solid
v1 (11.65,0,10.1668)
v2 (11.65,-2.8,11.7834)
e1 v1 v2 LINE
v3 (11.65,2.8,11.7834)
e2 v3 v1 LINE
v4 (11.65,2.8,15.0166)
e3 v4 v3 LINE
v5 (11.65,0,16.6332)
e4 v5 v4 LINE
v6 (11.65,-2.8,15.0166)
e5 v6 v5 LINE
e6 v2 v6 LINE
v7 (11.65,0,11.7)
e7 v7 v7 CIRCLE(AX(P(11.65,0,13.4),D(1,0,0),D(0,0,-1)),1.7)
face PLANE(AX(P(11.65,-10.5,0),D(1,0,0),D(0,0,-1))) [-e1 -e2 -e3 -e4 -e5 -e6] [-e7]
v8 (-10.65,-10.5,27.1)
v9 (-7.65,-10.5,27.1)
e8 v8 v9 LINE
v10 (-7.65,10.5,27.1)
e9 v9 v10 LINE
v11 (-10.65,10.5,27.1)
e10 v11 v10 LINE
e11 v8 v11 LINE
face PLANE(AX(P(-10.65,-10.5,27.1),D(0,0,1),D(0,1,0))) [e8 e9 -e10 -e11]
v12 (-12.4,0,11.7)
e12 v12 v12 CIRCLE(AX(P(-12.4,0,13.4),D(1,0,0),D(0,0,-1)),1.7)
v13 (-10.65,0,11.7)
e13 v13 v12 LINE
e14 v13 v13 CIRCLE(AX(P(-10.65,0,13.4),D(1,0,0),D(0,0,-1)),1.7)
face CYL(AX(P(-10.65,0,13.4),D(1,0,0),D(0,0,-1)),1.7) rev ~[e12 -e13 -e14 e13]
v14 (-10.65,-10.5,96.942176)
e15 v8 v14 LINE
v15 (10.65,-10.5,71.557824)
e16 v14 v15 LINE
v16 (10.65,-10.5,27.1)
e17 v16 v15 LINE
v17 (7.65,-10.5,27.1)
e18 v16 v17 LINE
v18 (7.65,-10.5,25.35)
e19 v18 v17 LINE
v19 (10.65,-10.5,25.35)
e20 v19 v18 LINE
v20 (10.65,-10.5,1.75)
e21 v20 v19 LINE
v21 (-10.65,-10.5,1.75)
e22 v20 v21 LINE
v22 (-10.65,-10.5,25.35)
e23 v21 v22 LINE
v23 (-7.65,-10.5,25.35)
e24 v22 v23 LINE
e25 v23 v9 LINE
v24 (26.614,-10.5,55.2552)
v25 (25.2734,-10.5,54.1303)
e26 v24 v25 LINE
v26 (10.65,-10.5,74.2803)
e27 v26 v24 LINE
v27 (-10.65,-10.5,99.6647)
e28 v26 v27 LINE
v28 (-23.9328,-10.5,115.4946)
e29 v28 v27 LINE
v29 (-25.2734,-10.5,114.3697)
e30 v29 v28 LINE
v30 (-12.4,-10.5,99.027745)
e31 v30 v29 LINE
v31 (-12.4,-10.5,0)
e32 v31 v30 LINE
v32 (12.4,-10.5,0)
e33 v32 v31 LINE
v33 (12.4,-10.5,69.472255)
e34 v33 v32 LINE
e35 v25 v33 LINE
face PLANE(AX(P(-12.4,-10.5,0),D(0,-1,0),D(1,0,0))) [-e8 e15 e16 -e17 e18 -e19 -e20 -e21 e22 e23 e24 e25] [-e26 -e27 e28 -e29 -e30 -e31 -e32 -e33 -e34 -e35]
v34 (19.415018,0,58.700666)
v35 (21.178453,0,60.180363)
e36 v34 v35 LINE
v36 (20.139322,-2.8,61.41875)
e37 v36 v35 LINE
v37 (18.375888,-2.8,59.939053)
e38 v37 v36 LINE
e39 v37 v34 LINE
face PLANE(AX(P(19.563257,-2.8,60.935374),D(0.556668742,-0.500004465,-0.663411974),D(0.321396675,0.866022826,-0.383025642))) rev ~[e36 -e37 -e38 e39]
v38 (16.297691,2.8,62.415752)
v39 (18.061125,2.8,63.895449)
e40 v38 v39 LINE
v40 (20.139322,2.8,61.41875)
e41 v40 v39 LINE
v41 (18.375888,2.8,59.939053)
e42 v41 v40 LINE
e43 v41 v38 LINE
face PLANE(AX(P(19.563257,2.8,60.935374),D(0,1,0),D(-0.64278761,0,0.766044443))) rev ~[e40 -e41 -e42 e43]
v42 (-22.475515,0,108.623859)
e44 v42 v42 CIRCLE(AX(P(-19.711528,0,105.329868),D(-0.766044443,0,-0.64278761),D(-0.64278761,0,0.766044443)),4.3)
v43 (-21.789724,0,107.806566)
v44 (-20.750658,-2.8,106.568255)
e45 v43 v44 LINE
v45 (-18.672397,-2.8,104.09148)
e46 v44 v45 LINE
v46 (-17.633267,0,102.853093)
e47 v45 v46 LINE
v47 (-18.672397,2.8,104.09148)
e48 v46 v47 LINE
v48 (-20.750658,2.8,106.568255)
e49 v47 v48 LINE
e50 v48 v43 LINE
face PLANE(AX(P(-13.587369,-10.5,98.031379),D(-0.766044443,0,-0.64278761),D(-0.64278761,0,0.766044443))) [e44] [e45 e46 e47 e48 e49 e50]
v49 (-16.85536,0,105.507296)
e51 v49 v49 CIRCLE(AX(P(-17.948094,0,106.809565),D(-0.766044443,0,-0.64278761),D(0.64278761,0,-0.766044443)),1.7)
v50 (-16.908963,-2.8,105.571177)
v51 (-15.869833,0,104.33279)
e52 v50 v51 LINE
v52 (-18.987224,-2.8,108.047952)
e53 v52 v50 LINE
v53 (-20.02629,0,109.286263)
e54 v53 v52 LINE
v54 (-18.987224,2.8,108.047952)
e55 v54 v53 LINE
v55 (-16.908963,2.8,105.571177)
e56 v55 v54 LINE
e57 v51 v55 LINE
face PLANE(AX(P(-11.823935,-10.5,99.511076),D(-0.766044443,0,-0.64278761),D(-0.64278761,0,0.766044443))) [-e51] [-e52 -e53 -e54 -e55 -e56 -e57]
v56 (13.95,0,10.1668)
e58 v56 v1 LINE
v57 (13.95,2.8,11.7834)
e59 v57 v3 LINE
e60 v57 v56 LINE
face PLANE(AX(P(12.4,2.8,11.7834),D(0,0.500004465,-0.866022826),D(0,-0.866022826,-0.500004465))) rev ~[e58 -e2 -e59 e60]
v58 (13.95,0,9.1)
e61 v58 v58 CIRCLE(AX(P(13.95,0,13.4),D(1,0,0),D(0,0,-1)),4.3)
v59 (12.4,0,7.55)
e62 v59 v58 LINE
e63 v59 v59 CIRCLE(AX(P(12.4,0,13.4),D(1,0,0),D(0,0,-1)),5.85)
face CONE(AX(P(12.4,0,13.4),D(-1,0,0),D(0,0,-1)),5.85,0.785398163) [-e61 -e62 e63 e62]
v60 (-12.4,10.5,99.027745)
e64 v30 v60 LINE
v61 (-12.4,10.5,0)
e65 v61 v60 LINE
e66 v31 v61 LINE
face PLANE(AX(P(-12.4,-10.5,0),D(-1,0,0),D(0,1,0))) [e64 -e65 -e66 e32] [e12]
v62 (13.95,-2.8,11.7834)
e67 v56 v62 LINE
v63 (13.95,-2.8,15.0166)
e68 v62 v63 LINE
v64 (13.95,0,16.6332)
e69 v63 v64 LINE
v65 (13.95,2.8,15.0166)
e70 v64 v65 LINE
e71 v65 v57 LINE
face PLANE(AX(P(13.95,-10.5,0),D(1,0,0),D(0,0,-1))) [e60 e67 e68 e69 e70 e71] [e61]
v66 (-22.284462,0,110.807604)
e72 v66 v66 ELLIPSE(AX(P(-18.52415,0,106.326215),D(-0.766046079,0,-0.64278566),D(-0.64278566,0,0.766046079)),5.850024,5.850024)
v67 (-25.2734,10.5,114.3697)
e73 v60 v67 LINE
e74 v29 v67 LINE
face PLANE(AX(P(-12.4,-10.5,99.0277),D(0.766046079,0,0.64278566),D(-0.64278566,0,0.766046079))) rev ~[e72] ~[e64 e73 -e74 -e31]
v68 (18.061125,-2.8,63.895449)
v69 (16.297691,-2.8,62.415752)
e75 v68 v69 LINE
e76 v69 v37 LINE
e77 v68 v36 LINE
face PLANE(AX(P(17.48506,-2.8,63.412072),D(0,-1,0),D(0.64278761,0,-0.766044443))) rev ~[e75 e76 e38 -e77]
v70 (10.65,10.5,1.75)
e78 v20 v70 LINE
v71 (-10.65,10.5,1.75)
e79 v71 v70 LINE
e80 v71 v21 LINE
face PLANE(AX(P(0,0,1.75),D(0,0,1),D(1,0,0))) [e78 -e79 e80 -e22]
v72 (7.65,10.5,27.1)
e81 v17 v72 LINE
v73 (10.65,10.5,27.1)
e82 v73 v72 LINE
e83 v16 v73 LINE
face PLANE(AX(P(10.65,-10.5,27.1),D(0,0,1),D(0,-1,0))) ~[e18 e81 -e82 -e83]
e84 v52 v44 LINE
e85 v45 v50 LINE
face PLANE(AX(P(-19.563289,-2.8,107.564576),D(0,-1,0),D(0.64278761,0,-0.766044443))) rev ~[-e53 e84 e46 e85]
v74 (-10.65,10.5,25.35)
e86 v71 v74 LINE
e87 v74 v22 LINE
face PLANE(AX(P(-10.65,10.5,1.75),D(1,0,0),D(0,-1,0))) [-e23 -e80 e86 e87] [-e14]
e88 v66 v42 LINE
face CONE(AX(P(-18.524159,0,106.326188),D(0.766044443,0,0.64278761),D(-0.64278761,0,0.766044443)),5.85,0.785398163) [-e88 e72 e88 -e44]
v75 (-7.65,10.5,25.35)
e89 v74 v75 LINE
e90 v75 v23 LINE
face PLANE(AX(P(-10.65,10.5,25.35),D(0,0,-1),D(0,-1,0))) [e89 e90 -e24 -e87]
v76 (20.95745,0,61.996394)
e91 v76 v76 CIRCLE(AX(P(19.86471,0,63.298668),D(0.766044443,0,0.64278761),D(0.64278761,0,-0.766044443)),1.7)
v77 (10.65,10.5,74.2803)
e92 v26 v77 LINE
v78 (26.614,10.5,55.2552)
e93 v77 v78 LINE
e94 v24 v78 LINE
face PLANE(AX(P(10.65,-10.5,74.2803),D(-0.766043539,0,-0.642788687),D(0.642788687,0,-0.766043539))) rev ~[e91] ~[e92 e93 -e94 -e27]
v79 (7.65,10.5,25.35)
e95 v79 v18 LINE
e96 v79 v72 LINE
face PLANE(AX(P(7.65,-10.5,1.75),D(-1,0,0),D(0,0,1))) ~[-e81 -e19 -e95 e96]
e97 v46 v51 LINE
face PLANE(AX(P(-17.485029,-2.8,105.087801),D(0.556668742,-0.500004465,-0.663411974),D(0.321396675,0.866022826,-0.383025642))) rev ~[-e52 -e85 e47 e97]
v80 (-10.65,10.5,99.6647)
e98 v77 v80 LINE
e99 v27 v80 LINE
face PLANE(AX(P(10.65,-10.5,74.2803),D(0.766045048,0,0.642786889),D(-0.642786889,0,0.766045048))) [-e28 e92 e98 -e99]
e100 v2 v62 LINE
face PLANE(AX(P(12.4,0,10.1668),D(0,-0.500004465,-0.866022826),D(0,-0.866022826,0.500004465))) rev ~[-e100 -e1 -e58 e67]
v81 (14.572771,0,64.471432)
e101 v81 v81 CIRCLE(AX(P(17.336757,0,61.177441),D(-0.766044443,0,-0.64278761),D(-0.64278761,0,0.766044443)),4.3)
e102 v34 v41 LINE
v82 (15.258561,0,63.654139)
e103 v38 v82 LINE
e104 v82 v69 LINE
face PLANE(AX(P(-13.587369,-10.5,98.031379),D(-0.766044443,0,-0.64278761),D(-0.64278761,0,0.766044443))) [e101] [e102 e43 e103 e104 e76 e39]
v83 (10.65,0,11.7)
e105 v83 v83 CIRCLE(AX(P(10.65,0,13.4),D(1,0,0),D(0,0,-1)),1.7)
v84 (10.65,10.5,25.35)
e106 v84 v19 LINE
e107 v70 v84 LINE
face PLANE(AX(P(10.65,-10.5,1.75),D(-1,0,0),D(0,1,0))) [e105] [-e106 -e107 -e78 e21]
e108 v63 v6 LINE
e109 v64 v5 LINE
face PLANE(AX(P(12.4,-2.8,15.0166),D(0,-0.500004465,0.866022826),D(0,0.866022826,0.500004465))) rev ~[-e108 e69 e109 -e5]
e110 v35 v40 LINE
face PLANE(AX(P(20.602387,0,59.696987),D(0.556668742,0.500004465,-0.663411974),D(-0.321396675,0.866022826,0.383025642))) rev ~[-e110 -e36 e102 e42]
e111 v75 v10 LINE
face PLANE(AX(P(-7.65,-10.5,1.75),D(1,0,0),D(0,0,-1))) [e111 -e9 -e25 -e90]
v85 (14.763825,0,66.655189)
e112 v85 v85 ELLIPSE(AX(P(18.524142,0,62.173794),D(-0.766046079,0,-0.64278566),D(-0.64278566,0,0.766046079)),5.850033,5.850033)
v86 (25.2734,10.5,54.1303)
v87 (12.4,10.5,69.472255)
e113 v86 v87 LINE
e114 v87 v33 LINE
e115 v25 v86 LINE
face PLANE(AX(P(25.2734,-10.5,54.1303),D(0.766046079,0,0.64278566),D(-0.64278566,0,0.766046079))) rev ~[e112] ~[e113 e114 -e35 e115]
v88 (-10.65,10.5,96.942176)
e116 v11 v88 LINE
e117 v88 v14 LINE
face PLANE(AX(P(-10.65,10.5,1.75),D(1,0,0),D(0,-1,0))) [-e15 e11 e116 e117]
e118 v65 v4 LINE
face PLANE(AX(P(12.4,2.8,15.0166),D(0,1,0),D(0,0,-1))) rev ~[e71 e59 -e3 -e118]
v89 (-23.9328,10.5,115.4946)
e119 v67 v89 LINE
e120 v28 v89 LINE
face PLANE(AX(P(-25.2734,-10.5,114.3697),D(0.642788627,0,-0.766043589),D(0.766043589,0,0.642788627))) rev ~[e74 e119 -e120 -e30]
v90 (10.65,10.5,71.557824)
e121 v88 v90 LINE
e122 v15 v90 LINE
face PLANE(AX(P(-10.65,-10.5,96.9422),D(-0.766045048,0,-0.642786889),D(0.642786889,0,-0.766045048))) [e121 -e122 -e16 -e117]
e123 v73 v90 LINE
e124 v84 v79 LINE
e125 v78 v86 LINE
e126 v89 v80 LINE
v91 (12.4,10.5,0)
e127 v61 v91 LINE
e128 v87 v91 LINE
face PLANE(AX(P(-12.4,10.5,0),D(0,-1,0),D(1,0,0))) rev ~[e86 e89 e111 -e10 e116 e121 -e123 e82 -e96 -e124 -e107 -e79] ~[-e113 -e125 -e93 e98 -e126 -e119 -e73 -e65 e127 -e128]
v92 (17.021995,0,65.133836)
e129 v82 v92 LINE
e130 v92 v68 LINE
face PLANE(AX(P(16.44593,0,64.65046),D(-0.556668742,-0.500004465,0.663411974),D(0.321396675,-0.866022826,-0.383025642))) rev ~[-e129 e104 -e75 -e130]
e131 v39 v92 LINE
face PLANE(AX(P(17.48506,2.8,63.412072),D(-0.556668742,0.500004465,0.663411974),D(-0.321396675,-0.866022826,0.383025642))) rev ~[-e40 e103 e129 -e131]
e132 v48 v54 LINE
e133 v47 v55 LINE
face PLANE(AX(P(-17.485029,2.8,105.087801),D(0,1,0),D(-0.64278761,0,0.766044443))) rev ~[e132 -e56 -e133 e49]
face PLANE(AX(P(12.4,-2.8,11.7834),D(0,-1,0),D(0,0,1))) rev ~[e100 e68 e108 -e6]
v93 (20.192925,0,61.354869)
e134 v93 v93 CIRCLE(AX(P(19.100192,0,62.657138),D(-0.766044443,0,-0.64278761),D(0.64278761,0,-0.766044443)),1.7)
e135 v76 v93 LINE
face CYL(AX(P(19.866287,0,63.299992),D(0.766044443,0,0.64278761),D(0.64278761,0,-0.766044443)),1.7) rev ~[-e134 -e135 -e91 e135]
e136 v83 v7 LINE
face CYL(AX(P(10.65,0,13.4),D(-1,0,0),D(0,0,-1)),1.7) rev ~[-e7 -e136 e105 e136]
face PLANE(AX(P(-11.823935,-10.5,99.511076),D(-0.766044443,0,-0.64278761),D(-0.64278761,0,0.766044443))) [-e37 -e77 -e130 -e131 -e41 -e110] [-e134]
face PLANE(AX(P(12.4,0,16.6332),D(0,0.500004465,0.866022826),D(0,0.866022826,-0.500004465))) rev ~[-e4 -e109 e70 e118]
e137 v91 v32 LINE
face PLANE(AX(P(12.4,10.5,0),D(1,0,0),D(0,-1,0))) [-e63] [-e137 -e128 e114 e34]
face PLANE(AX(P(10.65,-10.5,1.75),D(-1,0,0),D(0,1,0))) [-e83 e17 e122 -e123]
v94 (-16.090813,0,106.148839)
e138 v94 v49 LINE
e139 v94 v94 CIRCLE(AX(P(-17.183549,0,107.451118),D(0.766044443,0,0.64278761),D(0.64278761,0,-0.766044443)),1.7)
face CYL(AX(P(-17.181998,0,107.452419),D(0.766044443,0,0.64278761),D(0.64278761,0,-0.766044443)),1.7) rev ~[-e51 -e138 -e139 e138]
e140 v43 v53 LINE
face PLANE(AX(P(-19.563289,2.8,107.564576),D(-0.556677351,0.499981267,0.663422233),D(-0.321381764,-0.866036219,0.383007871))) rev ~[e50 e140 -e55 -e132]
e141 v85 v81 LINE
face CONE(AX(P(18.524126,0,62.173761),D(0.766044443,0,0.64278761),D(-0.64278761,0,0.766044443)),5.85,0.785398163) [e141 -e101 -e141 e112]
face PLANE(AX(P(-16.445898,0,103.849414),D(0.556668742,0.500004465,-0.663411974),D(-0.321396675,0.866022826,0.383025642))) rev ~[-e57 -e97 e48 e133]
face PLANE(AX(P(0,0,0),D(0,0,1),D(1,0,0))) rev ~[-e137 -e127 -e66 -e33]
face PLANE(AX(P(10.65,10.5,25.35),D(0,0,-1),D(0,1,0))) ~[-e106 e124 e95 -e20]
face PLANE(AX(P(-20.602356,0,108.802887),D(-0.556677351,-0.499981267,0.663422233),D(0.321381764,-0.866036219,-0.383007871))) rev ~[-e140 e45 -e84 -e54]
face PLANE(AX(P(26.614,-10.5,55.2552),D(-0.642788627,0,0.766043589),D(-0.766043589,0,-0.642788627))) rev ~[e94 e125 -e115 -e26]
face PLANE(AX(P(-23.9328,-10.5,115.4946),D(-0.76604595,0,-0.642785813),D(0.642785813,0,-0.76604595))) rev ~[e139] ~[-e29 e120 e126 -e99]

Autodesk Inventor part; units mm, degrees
ref_plane "YZ Plane" through (0, 0, 0) normal (1, 0, 0) x (0, 1, 0)
ref_plane "XZ Plane" through (0, 0, 0) normal (0, 1, 0) x (-1, 0, 0)
sketch "Sketch1" plane through (0, 0, 0) normal (0, 0, 1) x (1, 0, 0)
  line L0 (-12.4, 10.5) -> (12.4, 10.5)
  line L1 (12.4, 10.5) -> (12.4, -10.5)
  line L2 (12.4, -10.5) -> (-12.4, -10.5)
  line L3 (-12.4, -10.5) -> (-12.4, 10.5)
  point P0 (0, 0)
  point P1 (-12.4, 0)
  point P2 (0, 10.5)
  dimension "d0" = 24.8
  dimension "d1" = 21
extrude "Extrusion1" add sketch "Sketch1" along normal blind 1.75
ref_plane "Work Plane1" through (0, 0, 84.25) normal (0, 0, 1) x (1, 0, 0)
sketch "Sketch3" plane through (0, 0, 84.25) normal (0, 0, 1) x (1, 0, 0)
  line L0 (0, 9.7015) -> (0, -9.7015) construction
  point P0 (0, 0)
  point P1 (0, 0)
ref_plane "Work Plane2" through (0, 9.7015, 84.25) normal (0.7660444, 0, 0.6427876) x (0, -1, 0)
sketch "Sketch2" plane through (0, 0, 1.75) normal (0, 0, 1) x (1, 0, 0)
  line L0 (12.4, 10.5) -> (12.4, -10.5) projected
  line L1 (-12.4, 10.5) -> (12.4, 10.5) projected
  line L2 (12.4, -10.5) -> (-12.4, -10.5) projected
  line L3 (-12.4, 10.5) -> (-10.65, 10.5)
  line L4 (-10.65, 10.5) -> (-10.65, -10.5)
  line L5 (-10.65, -10.5) -> (-12.4, -10.5)
  line L6 (-12.4, -10.5) -> (-12.4, 10.5)
  line L7 (12.4, -10.5) -> (10.65, -10.5)
  line L8 (10.65, -10.5) -> (10.65, 10.5)
  line L9 (10.65, 10.5) -> (12.4, 10.5)
  line L10 (12.4, 10.5) -> (12.4, -10.5)
  point P0 (0, 0)
  dimension "d4" = 1.75
  dimension "d5" = 1.75
extrude "Extrusion2" add sketch "Sketch2" along normal up to surface contours L0 L2 L8 L1 | L4 L2 L6 L1 surface through (0, 9.7015, 84.25) normal (0.7660444, 0, 0.6427876)
sketch "Sketch4" plane through (-12.4, -10.5, 0) normal (0, -1, 0) x (1, 0, 0)
  line L0 (1.75, 96.9422) -> (0, 99.0277) projected
  line L1 (24.8, 69.4723) -> (23.05, 71.5578) projected
  line L2 (23.05, 1.75) -> (23.05, 71.5578) projected
  line L3 (23.05, 71.5578) -> (23.05, 74.2803)
  line L4 (23.05, 74.2803) -> (39.014, 55.2552)
  line L5 (39.014, 55.2552) -> (37.6734, 54.1303)
  line L6 (37.6734, 54.1303) -> (24.8, 69.4723)
  line L7 (0, 99.0277) -> (-12.8734, 114.3697)
  line L8 (-12.8734, 114.3697) -> (-11.5328, 115.4946)
  line L9 (-11.5328, 115.4946) -> (1.75, 99.6647)
  line L10 (1.75, 99.6647) -> (1.75, 96.9422)
  line L11 (24.8, 0) -> (24.8, 69.4723) projected
  line L12 (23.05, 71.5578) -> (23.05, 74.2803)
  line L13 (23.05, 74.2803) -> (1.75, 99.6647)
  line L14 (1.75, 99.6647) -> (1.75, 96.9422)
  line L15 (1.75, 96.9422) -> (23.05, 71.5578)
  point P0 (12.4, 0)
  dimension "d10" = 1.75
  dimension "d11" = 22.75
  dimension "d12" = 1.75
  dimension "d13" = 22.75
extrude "Extrusion3" add sketch "Sketch4" against normal up to surface (21 mm away)
sketch "Sketch5" plane through (-10.65, -10.5, 1.75) normal (1, 0, 0) x (0, 0, -1)
  line L0 (0, 0) -> (-95.1922, 0) projected
  line L1 (0, 21) -> (-23.3, 21)
  line L2 (-23.3, 21) -> (-23.3, 0)
  line L3 (-23.3, 0) -> (0, 0)
  line L4 (0, 0) -> (0, 21)
  circle A0 centre (-11.65, 10.5) radius 1.7
  point P0 (-97.7359, 0)
  point P1 (1.75, 10.5)
  dimension "d16" = 23.3
  dimension "d17" = 3.4
extrude "Extrusion4" cut sketch "Sketch5" against normal up to surface (1.75 mm away) contours A0
mirror "Mirror1" about plane through (0, 0, 0) normal (1, 0, 0) of "Extrusion4"
sketch "Sketch8" plane through (-23.9328, -10.5, 115.4946) normal (0.7660444, 0, 0.6427876) x (0.6427876, 0, -0.7660444)
  line L0 (0, 0) -> (0, 21) projected
  line L1 (78.6369, 0) -> (78.6369, 21) projected
  circle A0 centre (10.5, 10.5) radius 1.7
  circle A1 centre (68.1369, 10.5) radius 1.7
  point P0 (103.8577, 10.5)
  point P1 (0, 10.5)
  point P2 (78.6369, 10.5)
  dimension "d25" = 3.4
  dimension "d26" = 3.4
  dimension "d27" = 10.5
  dimension "d28" = 10.5
extrude "Extrusion6" cut sketch "Sketch8" against normal up to surface (1.75 mm away)
sketch "Sketch9" plane through (-12.4, -10.5, 99.0277) normal (-0.7660444, 0, -0.6427876) x (-0.6427876, 0, 0.7660444)
  circle A0 centre (9.5275, 10.5) radius 1.7 projected
  line L0 (20.0275, 21) -> (0, 21) projected
  circle A1 centre (9.5275, 10.5) radius 4.3
  line L1 (11.1441, 7.7) -> (7.9109, 7.7)
  line L2 (7.9109, 7.7) -> (6.2943, 10.5)
  line L3 (6.2943, 10.5) -> (7.9109, 13.3)
  line L4 (7.9109, 13.3) -> (11.1441, 13.3)
  line L5 (11.1441, 13.3) -> (12.7606, 10.5)
  line L6 (12.7606, 10.5) -> (11.1441, 7.7)
  circle A2 centre (-48.1094, 10.5) radius 1.7 projected
  line L7 (-38.582, 21) -> (-58.6094, 21) projected
  circle A3 centre (-48.1094, 10.5) radius 4.3
  line L8 (-46.4929, 7.7) -> (-49.726, 7.7)
  line L9 (-49.726, 7.7) -> (-51.3426, 10.5)
  line L10 (-51.3426, 10.5) -> (-49.726, 13.3)
  line L11 (-49.726, 13.3) -> (-46.4929, 13.3)
  line L12 (-46.4929, 13.3) -> (-44.8763, 10.5)
  line L13 (-44.8763, 10.5) -> (-46.4929, 7.7)
  point P0 (-83.8302, 10.5)
  dimension "d31" = 5.6
  dimension "d32" = 1.5
  dimension "d38" = 5.6
  dimension "d39" = 1.5
extrude "Extrusion7" cut sketch "Sketch9" against normal blind 0.75 contours L1 L2 L3 L4 L5 L6
extrude "Extrusion8" add sketch "Sketch9" along normal blind 1.55 contours A1
draft "FaceDraft1" angle 45 pull direction (-0.7660444, 0, -0.6427876) faces at (-22.0708, -0.346, 108.9453) fixed edges at (-16.9475, 0, 102.0359)
extrude "Extrusion9" cut sketch "Sketch9" against normal blind 0.75 contours L8 L9 L10 L11 L12 L13
extrude "Extrusion10" add sketch "Sketch9" along normal blind 1.55 contours A3
draft "FaceDraft2" angle 45 pull direction (-0.7660444, 0, -0.6427876) faces at (15.0044, -0.6898, 64.7609) fixed edges at (20.1008, 0, 57.8835)
sketch "Sketch10" plane through (12.4, -10.5, 0) normal (1, 0, 0) x (0, 0, -1)
  circle A0 centre (-13.4, 10.5) radius 1.7 projected
  line L0 (0, 21) -> (-69.4723, 21) projected
  circle A1 centre (-13.4, 10.5) radius 4.3
  line L1 (-11.7834, 7.7) -> (-15.0166, 7.7)
  line L2 (-15.0166, 7.7) -> (-16.6332, 10.5)
  line L3 (-16.6332, 10.5) -> (-15.0166, 13.3)
  line L4 (-15.0166, 13.3) -> (-11.7834, 13.3)
  line L5 (-11.7834, 13.3) -> (-10.1668, 10.5)
  line L6 (-10.1668, 10.5) -> (-11.7834, 7.7)
  point P0 (0, 10.5)
  dimension "d45" = 5.6
  dimension "d46" = 1.5
extrude "Extrusion11" cut sketch "Sketch10" against normal blind 0.75 contours L1 L2 L3 L4 L5 L6
extrude "Extrusion12" add sketch "Sketch10" along normal blind 1.55 contours A1
draft "FaceDraft3" angle 45 pull direction (1, 0, 0) faces at (12.9167, -0.6898, 9.1557) fixed edges at (13.95, 0, 17.7)
sketch "Sketch11" plane through (-10.65, -10.5, 1.75) normal (1, 0, 0) x (0, 0, -1)
  line L0 (0, 0) -> (-95.1922, 0) projected
  line L1 (0, 21) -> (0, 0) projected
  line L2 (0, 21) -> (-95.1922, 21) projected
  line L3 (-25.35, 21) -> (-23.6, 21)
  line L4 (-23.6, 21) -> (-23.6, 0)
  line L5 (-23.6, 0) -> (-25.35, 0)
  line L6 (-25.35, 0) -> (-25.35, 21)
  point P0 (1.75, 10.5)
  dimension "d52" = 1.75
  dimension "d53" = 23.6
extrude "Extrusion13" add sketch "Sketch11" along normal blind 3 contours L0 L6 L2 L4
mirror "Mirror2" about plane through (0, 0, 0) normal (1, 0, 0) of "Extrusion13"
equation "\"d4\" = d5"
equation "\"d12\" = d10"
equation "\"d26\" = d25"
equation "\"d28\" = d27"
properties part number "carousel_mount_bracket"
